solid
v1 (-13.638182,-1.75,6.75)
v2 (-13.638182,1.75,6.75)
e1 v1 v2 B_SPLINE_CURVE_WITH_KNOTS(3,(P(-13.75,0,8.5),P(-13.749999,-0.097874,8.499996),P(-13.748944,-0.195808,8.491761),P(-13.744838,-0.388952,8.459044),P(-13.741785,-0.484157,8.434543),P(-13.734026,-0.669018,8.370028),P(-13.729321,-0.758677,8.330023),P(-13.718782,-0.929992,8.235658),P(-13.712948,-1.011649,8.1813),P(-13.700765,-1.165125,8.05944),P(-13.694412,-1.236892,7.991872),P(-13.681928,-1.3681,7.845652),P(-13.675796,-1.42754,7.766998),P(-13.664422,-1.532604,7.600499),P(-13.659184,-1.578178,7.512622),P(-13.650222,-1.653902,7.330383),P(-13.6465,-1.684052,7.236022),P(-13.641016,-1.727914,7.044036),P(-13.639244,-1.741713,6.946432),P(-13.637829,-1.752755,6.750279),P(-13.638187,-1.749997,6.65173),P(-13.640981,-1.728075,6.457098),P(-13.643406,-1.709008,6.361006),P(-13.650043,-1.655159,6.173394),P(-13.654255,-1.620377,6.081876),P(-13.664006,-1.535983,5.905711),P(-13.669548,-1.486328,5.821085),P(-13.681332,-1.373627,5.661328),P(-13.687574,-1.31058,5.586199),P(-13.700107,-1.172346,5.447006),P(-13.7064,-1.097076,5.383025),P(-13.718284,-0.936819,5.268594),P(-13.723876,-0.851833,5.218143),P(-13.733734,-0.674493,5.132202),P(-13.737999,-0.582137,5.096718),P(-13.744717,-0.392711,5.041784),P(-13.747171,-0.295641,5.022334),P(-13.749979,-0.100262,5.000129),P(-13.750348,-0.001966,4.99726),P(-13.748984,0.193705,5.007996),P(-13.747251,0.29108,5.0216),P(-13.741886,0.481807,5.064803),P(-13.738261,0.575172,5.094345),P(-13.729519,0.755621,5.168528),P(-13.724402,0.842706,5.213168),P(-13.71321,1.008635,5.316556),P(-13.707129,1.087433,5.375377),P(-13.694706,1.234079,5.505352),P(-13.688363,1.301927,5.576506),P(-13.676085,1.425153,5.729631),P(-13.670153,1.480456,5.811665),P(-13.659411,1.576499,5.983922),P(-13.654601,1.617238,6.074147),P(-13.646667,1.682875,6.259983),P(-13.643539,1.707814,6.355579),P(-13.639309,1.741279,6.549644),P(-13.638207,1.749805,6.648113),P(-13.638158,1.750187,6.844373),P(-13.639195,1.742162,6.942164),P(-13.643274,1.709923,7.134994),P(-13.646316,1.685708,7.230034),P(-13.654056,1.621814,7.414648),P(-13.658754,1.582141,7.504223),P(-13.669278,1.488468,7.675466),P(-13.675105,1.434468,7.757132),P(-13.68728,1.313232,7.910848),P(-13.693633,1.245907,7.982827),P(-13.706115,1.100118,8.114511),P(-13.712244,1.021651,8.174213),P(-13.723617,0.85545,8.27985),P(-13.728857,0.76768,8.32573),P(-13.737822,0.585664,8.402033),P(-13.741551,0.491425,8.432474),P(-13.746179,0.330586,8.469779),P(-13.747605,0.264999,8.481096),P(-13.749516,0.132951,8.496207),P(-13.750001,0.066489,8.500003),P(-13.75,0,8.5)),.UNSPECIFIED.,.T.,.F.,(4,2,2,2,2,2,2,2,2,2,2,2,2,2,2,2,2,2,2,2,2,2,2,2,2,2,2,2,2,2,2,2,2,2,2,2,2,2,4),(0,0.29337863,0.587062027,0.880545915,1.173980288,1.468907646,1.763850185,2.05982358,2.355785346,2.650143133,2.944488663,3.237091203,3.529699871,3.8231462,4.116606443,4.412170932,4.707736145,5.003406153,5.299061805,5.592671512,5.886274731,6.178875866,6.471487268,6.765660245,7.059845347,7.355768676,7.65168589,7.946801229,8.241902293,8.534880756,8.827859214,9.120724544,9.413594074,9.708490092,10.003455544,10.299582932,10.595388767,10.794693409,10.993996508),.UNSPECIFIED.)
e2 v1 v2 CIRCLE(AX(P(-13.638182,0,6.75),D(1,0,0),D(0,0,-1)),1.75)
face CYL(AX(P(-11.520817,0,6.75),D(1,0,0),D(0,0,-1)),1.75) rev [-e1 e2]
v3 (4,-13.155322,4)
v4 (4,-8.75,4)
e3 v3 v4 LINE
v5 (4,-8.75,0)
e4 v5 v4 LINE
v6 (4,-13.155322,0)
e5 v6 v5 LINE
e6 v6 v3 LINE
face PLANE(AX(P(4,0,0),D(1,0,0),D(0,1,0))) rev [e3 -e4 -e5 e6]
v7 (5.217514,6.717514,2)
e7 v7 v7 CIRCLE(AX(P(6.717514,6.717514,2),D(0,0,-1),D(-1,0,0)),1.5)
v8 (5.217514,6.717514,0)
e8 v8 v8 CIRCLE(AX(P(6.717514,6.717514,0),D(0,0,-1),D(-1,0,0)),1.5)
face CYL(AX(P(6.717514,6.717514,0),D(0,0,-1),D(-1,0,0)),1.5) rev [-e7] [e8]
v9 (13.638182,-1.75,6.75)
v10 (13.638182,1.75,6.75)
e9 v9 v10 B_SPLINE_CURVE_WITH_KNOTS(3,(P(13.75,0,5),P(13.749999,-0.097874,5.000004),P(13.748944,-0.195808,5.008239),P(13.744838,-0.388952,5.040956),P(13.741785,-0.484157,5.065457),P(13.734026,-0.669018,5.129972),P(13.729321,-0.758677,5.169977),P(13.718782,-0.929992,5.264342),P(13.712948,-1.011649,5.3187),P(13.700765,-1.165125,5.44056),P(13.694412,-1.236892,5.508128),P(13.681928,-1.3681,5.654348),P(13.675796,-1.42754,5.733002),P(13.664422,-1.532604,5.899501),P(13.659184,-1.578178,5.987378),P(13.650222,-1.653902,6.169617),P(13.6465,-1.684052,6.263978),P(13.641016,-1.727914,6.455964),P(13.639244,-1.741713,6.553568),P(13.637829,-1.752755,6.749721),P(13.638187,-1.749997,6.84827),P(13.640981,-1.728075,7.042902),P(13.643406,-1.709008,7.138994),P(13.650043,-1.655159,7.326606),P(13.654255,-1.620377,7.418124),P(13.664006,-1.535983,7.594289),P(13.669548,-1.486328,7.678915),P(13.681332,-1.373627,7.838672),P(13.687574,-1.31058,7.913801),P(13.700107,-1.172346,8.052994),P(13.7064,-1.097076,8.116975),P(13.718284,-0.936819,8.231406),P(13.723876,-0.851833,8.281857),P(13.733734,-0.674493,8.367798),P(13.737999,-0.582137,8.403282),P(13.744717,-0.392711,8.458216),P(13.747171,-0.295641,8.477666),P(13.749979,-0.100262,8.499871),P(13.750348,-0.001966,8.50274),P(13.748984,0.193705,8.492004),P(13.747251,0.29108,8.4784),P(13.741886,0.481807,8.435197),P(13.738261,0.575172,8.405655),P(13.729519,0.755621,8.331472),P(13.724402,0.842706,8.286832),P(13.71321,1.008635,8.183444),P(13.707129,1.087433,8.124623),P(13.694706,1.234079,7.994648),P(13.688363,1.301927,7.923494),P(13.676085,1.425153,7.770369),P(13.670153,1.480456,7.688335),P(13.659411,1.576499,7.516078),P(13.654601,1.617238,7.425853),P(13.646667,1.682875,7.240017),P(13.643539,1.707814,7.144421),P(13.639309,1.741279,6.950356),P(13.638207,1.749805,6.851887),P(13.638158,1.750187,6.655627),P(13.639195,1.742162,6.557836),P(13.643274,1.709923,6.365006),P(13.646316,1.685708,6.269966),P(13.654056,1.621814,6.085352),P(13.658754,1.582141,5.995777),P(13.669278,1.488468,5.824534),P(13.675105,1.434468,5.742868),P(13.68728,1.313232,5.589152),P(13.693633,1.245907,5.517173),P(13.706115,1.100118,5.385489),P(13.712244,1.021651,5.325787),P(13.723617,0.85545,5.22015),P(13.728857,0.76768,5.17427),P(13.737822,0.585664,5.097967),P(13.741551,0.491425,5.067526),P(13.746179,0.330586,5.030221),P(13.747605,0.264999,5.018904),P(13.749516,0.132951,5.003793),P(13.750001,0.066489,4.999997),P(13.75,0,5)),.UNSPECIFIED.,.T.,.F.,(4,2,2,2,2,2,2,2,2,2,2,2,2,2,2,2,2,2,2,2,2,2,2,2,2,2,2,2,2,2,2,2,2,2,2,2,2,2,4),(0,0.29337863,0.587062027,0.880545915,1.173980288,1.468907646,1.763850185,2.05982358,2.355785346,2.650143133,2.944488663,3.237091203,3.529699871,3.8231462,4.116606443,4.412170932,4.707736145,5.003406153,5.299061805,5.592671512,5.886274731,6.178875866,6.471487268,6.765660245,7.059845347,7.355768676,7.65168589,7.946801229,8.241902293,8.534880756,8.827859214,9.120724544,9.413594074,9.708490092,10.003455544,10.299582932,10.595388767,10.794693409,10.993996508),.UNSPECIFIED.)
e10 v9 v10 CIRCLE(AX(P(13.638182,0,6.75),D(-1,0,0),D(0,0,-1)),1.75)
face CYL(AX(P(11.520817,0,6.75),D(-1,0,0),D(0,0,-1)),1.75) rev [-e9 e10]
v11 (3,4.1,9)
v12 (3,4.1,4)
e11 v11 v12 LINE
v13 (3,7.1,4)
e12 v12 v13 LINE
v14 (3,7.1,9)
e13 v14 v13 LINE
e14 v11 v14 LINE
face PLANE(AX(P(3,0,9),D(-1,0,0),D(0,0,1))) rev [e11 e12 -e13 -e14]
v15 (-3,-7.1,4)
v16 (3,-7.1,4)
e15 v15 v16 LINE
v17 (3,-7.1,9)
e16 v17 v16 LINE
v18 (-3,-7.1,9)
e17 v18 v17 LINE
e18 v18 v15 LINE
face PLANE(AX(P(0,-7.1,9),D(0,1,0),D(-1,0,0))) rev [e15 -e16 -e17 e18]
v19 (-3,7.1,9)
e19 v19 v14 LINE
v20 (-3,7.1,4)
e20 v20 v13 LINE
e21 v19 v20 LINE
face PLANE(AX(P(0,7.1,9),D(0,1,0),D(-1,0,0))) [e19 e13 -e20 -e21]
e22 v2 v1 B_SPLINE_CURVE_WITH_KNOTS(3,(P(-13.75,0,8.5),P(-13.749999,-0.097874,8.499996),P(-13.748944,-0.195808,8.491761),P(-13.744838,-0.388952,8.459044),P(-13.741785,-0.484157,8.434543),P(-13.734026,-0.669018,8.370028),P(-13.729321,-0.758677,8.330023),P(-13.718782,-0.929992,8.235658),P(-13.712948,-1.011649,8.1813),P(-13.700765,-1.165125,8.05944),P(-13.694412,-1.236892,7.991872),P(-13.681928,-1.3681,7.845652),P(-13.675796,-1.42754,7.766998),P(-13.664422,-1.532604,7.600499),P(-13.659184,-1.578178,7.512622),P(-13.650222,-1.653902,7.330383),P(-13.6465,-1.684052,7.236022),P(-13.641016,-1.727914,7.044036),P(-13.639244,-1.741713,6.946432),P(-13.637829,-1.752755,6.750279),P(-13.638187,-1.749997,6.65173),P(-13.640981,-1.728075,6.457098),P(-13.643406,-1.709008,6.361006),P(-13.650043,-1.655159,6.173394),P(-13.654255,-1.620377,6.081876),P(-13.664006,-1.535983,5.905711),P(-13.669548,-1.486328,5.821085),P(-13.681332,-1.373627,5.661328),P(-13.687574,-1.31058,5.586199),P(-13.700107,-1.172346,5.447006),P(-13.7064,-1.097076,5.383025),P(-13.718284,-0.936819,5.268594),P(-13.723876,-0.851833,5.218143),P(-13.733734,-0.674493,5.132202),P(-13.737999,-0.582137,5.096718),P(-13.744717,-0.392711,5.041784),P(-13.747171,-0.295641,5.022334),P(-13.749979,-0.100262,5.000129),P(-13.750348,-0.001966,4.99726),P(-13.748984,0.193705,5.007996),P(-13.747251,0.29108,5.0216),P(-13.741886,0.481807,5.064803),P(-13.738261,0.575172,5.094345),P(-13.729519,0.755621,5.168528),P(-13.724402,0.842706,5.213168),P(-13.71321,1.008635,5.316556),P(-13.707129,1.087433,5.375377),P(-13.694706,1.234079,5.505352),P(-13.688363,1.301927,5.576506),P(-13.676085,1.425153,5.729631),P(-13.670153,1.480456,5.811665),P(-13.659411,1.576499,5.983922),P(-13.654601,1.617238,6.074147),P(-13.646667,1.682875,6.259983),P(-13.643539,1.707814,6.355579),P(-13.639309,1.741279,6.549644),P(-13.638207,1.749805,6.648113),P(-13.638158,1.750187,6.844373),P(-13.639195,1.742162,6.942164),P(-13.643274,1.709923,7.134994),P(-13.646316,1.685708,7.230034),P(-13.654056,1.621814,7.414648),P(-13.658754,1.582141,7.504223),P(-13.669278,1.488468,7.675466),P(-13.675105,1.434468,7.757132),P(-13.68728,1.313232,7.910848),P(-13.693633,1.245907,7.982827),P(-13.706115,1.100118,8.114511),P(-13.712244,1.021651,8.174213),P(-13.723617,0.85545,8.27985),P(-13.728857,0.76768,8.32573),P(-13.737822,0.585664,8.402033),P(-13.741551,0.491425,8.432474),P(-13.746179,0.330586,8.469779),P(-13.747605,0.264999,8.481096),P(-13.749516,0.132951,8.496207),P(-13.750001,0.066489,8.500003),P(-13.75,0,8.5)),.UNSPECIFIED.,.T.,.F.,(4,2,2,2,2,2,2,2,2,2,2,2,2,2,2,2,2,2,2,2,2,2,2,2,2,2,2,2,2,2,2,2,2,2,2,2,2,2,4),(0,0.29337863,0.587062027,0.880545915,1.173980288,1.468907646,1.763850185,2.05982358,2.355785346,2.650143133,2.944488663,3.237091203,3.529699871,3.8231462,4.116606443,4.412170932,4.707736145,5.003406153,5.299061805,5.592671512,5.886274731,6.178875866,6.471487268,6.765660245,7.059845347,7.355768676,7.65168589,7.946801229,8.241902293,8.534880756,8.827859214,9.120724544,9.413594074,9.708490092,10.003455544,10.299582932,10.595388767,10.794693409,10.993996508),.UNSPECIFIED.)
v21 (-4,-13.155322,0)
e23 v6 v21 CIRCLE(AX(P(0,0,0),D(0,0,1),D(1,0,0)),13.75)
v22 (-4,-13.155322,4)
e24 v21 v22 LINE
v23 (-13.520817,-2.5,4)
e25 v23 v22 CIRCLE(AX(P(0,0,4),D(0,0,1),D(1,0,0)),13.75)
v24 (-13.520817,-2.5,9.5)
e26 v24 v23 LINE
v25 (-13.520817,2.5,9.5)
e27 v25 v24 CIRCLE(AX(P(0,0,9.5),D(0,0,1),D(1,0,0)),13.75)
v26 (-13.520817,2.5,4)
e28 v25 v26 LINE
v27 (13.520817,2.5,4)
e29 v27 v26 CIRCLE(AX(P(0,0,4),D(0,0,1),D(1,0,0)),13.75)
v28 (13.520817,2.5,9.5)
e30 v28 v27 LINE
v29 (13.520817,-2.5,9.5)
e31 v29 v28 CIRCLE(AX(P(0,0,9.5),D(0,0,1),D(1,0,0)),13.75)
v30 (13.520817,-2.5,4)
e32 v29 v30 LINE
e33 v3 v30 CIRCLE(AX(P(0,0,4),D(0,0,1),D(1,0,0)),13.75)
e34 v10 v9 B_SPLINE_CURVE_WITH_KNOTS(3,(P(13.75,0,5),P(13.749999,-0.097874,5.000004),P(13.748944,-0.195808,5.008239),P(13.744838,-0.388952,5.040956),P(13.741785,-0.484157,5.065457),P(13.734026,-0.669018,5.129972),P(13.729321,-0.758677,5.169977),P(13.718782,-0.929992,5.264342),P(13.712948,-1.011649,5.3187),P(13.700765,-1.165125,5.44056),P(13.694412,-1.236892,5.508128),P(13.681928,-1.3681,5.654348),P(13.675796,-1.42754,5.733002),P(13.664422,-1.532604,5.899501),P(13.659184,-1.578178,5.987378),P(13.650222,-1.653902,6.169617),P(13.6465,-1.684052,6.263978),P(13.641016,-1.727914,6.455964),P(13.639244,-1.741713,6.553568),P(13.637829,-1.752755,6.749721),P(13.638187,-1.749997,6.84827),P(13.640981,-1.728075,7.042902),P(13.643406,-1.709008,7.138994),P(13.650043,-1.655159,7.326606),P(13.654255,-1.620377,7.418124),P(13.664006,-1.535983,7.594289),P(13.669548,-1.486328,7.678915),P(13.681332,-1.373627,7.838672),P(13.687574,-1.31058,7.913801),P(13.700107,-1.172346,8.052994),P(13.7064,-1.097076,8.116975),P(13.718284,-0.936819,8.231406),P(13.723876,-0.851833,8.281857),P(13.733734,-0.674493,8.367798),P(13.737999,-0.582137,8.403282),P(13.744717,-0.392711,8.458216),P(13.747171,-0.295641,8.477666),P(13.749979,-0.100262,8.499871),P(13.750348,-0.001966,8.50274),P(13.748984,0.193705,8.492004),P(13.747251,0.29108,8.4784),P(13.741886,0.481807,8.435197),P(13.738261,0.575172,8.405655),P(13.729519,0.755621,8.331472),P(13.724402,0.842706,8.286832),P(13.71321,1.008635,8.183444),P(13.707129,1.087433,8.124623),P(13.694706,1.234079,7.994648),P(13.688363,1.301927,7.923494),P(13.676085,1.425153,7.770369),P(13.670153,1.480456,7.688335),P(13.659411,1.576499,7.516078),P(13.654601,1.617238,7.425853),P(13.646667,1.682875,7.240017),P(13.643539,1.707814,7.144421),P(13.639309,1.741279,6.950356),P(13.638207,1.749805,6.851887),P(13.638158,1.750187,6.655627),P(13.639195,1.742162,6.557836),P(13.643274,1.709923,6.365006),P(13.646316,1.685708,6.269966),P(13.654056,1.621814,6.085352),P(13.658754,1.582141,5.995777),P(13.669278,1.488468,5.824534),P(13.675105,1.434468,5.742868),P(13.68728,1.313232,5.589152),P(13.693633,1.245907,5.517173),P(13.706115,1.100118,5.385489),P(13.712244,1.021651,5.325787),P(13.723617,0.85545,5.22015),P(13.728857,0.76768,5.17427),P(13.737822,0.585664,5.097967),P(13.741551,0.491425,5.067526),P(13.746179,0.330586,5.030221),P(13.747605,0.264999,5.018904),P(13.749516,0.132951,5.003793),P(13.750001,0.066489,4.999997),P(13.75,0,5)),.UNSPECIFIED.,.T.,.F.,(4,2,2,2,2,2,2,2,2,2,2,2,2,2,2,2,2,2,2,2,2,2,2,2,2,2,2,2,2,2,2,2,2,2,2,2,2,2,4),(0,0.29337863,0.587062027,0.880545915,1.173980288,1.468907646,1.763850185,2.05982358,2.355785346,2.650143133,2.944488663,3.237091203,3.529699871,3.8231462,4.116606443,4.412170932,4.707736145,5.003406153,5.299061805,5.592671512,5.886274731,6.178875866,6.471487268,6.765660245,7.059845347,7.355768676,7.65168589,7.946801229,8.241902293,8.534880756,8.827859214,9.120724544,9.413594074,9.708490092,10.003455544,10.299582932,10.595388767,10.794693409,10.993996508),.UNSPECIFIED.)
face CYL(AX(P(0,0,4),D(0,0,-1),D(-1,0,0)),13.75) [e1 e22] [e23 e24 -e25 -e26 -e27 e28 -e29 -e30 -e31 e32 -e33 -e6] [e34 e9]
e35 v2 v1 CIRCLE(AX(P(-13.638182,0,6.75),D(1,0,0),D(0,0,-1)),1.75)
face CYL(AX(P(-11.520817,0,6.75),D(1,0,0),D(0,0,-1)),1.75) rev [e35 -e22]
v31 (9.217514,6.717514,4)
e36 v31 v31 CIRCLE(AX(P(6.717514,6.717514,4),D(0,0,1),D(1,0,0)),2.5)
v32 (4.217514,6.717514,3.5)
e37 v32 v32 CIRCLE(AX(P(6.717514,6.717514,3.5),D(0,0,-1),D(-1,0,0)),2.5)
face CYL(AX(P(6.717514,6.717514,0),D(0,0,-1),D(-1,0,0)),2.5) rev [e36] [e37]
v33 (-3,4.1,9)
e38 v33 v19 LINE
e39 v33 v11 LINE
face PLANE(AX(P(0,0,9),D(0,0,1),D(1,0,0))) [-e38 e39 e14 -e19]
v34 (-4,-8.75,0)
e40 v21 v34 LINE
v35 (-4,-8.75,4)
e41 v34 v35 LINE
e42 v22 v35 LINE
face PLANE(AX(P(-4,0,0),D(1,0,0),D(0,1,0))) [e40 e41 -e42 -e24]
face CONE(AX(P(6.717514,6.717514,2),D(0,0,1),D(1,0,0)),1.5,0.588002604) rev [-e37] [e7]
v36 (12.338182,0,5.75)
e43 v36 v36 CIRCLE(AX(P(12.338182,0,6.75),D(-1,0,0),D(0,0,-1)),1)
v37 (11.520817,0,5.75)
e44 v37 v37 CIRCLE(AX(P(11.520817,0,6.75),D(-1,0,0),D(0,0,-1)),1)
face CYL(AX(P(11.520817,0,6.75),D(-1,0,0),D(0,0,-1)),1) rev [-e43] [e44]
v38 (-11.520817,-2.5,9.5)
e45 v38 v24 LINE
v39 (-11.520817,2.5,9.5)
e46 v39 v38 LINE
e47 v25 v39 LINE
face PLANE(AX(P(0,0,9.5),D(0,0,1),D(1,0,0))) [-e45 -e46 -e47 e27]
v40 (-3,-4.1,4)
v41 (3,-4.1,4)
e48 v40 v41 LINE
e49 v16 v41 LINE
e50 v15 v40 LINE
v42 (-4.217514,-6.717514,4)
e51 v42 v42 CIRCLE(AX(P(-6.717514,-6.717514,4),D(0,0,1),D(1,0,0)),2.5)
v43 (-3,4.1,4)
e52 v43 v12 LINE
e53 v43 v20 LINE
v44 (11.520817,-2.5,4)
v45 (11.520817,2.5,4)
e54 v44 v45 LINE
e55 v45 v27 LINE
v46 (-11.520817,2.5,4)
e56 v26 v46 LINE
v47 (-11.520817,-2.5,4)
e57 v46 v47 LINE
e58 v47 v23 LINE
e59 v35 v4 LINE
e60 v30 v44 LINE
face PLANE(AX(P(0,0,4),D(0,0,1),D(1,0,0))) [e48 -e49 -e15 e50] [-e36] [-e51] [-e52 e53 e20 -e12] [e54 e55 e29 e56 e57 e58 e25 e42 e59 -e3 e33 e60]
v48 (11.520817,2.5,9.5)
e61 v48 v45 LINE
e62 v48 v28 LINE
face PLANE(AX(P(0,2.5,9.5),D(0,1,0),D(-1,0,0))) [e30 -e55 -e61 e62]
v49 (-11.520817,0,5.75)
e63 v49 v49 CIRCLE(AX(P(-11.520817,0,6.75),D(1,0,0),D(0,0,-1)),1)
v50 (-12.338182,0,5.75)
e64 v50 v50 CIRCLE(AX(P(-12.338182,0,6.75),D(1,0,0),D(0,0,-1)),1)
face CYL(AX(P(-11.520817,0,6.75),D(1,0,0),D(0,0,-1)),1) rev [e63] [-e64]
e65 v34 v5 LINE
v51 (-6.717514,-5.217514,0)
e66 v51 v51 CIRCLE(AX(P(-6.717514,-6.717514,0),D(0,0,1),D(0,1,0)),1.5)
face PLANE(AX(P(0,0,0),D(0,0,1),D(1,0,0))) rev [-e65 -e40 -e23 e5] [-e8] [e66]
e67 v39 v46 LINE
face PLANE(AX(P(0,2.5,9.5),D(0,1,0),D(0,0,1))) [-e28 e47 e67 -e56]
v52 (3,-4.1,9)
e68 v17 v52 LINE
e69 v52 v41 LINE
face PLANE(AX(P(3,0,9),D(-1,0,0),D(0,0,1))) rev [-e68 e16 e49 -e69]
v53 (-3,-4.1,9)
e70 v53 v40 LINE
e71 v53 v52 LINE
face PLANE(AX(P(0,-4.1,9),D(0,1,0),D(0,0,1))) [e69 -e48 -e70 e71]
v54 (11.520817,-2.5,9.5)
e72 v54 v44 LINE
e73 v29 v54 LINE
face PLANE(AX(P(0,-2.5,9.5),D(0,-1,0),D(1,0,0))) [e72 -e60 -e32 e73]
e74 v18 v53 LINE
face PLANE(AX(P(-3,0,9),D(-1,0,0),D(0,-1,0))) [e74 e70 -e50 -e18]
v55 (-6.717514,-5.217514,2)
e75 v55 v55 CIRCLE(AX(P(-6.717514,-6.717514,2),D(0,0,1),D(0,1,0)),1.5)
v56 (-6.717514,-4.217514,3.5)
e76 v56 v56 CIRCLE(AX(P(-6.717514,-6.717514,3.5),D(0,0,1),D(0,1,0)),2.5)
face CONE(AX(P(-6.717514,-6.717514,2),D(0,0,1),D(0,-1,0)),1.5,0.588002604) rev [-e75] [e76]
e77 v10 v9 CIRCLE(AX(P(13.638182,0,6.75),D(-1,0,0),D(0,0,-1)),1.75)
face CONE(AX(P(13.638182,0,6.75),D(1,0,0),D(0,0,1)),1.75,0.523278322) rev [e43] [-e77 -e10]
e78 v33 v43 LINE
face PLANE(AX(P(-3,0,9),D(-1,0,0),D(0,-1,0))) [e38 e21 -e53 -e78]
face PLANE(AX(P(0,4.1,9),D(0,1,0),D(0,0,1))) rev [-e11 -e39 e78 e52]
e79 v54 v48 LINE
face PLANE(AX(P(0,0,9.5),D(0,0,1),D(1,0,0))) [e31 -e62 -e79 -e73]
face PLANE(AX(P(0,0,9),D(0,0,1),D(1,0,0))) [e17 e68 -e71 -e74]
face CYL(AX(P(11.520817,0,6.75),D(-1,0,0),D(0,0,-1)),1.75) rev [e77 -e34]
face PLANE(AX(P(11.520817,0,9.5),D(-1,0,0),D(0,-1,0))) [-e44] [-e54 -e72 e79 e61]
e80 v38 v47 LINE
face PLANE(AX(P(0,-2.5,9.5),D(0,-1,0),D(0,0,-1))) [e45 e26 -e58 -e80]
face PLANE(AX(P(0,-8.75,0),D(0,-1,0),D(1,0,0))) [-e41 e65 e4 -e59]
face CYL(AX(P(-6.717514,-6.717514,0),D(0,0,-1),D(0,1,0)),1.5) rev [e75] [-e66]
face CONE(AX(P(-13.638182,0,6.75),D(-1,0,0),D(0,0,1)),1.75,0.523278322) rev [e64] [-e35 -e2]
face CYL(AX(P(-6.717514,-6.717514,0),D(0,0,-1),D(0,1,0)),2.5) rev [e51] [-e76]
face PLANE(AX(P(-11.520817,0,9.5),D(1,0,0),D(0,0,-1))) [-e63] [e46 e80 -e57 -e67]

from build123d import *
from build123d.topology import SkipClean

# Parameters (mm, degrees)
SKETCH1_R           = 13.75
BOSS_EXTRUDE1_DEPTH = 4
BOSS_EXTRUDE2_DEPTH = 5.5
CIRPATTERN1_COUNT   = 2
CIRPATTERN1_ANGLE   = 180
CUT_EXTRUDE3_DEPTH  = 21.208290541
SKETCH12_W          = 6
SKETCH12_H          = 3
BOSS_EXTRUDE4_DEPTH = 5


with BuildPart() as part:
    # Sketch1 → Boss-Extrude1 (new body)
    with BuildSketch(Plane.XY):
        Circle(SKETCH1_R)
    extrude(amount=BOSS_EXTRUDE1_DEPTH)

    # Sketch2 → Boss-Extrude2 (add)
    with BuildSketch(Plane.XY.offset(4)):
        with BuildLine():
            Line((-11.520817283, 2.5), (-13.520817283, 2.5))
            ThreePointArc((-13.520817283, 2.5), (-13.75, 0), (-13.520817283, -2.5))
            Line((-13.520817283, -2.5), (-11.520817283, -2.5))
            Line((-11.520817283, -2.5), (-11.520817283, 2.5))
        make_face()
        with BuildLine():
            Line((11.520817283, -2.5), (13.520817283, -2.5))
            ThreePointArc((13.520817283, -2.5), (13.75, 0), (13.520817283, 2.5))
            Line((13.520817283, 2.5), (11.520817283, 2.5))
            Line((11.520817283, 2.5), (11.520817283, -2.5))
        make_face()
    extrude(amount=BOSS_EXTRUDE2_DEPTH)

    # Sketch6 → Cut-Revolve2 (revolve, cut)
    with BuildSketch(Plane.XY.offset(6.75)):
        Polygon((-12.338181697, 1), (-13.638181697, 1.75), (-15.174729208, 1.75), (-15.174729208, 0), (-11.520817283, 0), (-11.520817283, 1), align=None)
    cut_revolve2 = revolve(axis=Axis((-11.520817283, 0, 6.75), (-1, 0, 0)), mode=Mode.SUBTRACT)

    # CirPattern1: Cut-Revolve2 ×2 about axis
    with SkipClean():  # the faces are left unmerged after this step: merging them gives an invalid solid
        cirpattern1_axis = Axis((0, 0, 0), (0, 0, -1))
        for i in range(1, CIRPATTERN1_COUNT):
            add(cut_revolve2.rotate(cirpattern1_axis, i * CIRPATTERN1_ANGLE / (CIRPATTERN1_COUNT - 1)), mode=Mode.SUBTRACT)

    # Sketch10 → Cut-Revolve3 (revolve, cut)
    with SkipClean():  # the faces are left unmerged after this step: merging them gives an invalid solid
        with BuildSketch(Plane(origin=(0, 0, 0), x_dir=(-0.7071067811865561, -0.7071067811865389, 0), z_dir=(-0.7071067811865389, 0.7071067811865561, 0))):
            Polygon((-9.5, 0), (-8, 0), (-8, 2), (-7, 3.5), (-7, 4.049822385), (-9.5, 4.049822385), align=None)
        cut_revolve3 = revolve(axis=Axis((6.717514421, 6.717514421, 0), (0, 0, 1)), mode=Mode.SUBTRACT)

    # Mirror1: Cut-Revolve3 across plane
    with SkipClean():  # the faces are left unmerged after this step: merging them gives an invalid solid
        add(cut_revolve3.mirror(Plane(origin=(0, 0, 0), x_dir=(0, 0, 1), z_dir=(-0.7071067811865561, -0.7071067811865389, 0))), mode=Mode.SUBTRACT)

    # Sketch11 → Cut-Extrude3 (cut, through all)
    with SkipClean():  # the faces are left unmerged after this step: merging them gives an invalid solid
        with BuildSketch(Plane.XY.offset(4)):
            with BuildLine():
                ThreePointArc((-4, -13.155322117), (-2.021981816, -13.600517988), (-8e-09, -13.75))
                ThreePointArc((-8e-09, -13.75), (2.021981807, -13.600517989), (4, -13.155322117))
                Line((4, -13.155322117), (4, -8.75))
                Line((4, -8.75), (-4, -8.75))
                Line((-4, -8.75), (-4, -13.155322117))
            make_face()
        extrude(amount=-CUT_EXTRUDE3_DEPTH, mode=Mode.SUBTRACT)

    # Sketch12 → Boss-Extrude4 (add)
    with SkipClean():  # the faces are left unmerged after this step: merging them gives an invalid solid
        with BuildSketch(Plane.XY.offset(4)):
            with Locations((0, 5.6)):
                Rectangle(SKETCH12_W, SKETCH12_H)
            with Locations((0, -5.6)):
                Rectangle(SKETCH12_W, SKETCH12_H)
        extrude(amount=BOSS_EXTRUDE4_DEPTH)


solid = part.part
